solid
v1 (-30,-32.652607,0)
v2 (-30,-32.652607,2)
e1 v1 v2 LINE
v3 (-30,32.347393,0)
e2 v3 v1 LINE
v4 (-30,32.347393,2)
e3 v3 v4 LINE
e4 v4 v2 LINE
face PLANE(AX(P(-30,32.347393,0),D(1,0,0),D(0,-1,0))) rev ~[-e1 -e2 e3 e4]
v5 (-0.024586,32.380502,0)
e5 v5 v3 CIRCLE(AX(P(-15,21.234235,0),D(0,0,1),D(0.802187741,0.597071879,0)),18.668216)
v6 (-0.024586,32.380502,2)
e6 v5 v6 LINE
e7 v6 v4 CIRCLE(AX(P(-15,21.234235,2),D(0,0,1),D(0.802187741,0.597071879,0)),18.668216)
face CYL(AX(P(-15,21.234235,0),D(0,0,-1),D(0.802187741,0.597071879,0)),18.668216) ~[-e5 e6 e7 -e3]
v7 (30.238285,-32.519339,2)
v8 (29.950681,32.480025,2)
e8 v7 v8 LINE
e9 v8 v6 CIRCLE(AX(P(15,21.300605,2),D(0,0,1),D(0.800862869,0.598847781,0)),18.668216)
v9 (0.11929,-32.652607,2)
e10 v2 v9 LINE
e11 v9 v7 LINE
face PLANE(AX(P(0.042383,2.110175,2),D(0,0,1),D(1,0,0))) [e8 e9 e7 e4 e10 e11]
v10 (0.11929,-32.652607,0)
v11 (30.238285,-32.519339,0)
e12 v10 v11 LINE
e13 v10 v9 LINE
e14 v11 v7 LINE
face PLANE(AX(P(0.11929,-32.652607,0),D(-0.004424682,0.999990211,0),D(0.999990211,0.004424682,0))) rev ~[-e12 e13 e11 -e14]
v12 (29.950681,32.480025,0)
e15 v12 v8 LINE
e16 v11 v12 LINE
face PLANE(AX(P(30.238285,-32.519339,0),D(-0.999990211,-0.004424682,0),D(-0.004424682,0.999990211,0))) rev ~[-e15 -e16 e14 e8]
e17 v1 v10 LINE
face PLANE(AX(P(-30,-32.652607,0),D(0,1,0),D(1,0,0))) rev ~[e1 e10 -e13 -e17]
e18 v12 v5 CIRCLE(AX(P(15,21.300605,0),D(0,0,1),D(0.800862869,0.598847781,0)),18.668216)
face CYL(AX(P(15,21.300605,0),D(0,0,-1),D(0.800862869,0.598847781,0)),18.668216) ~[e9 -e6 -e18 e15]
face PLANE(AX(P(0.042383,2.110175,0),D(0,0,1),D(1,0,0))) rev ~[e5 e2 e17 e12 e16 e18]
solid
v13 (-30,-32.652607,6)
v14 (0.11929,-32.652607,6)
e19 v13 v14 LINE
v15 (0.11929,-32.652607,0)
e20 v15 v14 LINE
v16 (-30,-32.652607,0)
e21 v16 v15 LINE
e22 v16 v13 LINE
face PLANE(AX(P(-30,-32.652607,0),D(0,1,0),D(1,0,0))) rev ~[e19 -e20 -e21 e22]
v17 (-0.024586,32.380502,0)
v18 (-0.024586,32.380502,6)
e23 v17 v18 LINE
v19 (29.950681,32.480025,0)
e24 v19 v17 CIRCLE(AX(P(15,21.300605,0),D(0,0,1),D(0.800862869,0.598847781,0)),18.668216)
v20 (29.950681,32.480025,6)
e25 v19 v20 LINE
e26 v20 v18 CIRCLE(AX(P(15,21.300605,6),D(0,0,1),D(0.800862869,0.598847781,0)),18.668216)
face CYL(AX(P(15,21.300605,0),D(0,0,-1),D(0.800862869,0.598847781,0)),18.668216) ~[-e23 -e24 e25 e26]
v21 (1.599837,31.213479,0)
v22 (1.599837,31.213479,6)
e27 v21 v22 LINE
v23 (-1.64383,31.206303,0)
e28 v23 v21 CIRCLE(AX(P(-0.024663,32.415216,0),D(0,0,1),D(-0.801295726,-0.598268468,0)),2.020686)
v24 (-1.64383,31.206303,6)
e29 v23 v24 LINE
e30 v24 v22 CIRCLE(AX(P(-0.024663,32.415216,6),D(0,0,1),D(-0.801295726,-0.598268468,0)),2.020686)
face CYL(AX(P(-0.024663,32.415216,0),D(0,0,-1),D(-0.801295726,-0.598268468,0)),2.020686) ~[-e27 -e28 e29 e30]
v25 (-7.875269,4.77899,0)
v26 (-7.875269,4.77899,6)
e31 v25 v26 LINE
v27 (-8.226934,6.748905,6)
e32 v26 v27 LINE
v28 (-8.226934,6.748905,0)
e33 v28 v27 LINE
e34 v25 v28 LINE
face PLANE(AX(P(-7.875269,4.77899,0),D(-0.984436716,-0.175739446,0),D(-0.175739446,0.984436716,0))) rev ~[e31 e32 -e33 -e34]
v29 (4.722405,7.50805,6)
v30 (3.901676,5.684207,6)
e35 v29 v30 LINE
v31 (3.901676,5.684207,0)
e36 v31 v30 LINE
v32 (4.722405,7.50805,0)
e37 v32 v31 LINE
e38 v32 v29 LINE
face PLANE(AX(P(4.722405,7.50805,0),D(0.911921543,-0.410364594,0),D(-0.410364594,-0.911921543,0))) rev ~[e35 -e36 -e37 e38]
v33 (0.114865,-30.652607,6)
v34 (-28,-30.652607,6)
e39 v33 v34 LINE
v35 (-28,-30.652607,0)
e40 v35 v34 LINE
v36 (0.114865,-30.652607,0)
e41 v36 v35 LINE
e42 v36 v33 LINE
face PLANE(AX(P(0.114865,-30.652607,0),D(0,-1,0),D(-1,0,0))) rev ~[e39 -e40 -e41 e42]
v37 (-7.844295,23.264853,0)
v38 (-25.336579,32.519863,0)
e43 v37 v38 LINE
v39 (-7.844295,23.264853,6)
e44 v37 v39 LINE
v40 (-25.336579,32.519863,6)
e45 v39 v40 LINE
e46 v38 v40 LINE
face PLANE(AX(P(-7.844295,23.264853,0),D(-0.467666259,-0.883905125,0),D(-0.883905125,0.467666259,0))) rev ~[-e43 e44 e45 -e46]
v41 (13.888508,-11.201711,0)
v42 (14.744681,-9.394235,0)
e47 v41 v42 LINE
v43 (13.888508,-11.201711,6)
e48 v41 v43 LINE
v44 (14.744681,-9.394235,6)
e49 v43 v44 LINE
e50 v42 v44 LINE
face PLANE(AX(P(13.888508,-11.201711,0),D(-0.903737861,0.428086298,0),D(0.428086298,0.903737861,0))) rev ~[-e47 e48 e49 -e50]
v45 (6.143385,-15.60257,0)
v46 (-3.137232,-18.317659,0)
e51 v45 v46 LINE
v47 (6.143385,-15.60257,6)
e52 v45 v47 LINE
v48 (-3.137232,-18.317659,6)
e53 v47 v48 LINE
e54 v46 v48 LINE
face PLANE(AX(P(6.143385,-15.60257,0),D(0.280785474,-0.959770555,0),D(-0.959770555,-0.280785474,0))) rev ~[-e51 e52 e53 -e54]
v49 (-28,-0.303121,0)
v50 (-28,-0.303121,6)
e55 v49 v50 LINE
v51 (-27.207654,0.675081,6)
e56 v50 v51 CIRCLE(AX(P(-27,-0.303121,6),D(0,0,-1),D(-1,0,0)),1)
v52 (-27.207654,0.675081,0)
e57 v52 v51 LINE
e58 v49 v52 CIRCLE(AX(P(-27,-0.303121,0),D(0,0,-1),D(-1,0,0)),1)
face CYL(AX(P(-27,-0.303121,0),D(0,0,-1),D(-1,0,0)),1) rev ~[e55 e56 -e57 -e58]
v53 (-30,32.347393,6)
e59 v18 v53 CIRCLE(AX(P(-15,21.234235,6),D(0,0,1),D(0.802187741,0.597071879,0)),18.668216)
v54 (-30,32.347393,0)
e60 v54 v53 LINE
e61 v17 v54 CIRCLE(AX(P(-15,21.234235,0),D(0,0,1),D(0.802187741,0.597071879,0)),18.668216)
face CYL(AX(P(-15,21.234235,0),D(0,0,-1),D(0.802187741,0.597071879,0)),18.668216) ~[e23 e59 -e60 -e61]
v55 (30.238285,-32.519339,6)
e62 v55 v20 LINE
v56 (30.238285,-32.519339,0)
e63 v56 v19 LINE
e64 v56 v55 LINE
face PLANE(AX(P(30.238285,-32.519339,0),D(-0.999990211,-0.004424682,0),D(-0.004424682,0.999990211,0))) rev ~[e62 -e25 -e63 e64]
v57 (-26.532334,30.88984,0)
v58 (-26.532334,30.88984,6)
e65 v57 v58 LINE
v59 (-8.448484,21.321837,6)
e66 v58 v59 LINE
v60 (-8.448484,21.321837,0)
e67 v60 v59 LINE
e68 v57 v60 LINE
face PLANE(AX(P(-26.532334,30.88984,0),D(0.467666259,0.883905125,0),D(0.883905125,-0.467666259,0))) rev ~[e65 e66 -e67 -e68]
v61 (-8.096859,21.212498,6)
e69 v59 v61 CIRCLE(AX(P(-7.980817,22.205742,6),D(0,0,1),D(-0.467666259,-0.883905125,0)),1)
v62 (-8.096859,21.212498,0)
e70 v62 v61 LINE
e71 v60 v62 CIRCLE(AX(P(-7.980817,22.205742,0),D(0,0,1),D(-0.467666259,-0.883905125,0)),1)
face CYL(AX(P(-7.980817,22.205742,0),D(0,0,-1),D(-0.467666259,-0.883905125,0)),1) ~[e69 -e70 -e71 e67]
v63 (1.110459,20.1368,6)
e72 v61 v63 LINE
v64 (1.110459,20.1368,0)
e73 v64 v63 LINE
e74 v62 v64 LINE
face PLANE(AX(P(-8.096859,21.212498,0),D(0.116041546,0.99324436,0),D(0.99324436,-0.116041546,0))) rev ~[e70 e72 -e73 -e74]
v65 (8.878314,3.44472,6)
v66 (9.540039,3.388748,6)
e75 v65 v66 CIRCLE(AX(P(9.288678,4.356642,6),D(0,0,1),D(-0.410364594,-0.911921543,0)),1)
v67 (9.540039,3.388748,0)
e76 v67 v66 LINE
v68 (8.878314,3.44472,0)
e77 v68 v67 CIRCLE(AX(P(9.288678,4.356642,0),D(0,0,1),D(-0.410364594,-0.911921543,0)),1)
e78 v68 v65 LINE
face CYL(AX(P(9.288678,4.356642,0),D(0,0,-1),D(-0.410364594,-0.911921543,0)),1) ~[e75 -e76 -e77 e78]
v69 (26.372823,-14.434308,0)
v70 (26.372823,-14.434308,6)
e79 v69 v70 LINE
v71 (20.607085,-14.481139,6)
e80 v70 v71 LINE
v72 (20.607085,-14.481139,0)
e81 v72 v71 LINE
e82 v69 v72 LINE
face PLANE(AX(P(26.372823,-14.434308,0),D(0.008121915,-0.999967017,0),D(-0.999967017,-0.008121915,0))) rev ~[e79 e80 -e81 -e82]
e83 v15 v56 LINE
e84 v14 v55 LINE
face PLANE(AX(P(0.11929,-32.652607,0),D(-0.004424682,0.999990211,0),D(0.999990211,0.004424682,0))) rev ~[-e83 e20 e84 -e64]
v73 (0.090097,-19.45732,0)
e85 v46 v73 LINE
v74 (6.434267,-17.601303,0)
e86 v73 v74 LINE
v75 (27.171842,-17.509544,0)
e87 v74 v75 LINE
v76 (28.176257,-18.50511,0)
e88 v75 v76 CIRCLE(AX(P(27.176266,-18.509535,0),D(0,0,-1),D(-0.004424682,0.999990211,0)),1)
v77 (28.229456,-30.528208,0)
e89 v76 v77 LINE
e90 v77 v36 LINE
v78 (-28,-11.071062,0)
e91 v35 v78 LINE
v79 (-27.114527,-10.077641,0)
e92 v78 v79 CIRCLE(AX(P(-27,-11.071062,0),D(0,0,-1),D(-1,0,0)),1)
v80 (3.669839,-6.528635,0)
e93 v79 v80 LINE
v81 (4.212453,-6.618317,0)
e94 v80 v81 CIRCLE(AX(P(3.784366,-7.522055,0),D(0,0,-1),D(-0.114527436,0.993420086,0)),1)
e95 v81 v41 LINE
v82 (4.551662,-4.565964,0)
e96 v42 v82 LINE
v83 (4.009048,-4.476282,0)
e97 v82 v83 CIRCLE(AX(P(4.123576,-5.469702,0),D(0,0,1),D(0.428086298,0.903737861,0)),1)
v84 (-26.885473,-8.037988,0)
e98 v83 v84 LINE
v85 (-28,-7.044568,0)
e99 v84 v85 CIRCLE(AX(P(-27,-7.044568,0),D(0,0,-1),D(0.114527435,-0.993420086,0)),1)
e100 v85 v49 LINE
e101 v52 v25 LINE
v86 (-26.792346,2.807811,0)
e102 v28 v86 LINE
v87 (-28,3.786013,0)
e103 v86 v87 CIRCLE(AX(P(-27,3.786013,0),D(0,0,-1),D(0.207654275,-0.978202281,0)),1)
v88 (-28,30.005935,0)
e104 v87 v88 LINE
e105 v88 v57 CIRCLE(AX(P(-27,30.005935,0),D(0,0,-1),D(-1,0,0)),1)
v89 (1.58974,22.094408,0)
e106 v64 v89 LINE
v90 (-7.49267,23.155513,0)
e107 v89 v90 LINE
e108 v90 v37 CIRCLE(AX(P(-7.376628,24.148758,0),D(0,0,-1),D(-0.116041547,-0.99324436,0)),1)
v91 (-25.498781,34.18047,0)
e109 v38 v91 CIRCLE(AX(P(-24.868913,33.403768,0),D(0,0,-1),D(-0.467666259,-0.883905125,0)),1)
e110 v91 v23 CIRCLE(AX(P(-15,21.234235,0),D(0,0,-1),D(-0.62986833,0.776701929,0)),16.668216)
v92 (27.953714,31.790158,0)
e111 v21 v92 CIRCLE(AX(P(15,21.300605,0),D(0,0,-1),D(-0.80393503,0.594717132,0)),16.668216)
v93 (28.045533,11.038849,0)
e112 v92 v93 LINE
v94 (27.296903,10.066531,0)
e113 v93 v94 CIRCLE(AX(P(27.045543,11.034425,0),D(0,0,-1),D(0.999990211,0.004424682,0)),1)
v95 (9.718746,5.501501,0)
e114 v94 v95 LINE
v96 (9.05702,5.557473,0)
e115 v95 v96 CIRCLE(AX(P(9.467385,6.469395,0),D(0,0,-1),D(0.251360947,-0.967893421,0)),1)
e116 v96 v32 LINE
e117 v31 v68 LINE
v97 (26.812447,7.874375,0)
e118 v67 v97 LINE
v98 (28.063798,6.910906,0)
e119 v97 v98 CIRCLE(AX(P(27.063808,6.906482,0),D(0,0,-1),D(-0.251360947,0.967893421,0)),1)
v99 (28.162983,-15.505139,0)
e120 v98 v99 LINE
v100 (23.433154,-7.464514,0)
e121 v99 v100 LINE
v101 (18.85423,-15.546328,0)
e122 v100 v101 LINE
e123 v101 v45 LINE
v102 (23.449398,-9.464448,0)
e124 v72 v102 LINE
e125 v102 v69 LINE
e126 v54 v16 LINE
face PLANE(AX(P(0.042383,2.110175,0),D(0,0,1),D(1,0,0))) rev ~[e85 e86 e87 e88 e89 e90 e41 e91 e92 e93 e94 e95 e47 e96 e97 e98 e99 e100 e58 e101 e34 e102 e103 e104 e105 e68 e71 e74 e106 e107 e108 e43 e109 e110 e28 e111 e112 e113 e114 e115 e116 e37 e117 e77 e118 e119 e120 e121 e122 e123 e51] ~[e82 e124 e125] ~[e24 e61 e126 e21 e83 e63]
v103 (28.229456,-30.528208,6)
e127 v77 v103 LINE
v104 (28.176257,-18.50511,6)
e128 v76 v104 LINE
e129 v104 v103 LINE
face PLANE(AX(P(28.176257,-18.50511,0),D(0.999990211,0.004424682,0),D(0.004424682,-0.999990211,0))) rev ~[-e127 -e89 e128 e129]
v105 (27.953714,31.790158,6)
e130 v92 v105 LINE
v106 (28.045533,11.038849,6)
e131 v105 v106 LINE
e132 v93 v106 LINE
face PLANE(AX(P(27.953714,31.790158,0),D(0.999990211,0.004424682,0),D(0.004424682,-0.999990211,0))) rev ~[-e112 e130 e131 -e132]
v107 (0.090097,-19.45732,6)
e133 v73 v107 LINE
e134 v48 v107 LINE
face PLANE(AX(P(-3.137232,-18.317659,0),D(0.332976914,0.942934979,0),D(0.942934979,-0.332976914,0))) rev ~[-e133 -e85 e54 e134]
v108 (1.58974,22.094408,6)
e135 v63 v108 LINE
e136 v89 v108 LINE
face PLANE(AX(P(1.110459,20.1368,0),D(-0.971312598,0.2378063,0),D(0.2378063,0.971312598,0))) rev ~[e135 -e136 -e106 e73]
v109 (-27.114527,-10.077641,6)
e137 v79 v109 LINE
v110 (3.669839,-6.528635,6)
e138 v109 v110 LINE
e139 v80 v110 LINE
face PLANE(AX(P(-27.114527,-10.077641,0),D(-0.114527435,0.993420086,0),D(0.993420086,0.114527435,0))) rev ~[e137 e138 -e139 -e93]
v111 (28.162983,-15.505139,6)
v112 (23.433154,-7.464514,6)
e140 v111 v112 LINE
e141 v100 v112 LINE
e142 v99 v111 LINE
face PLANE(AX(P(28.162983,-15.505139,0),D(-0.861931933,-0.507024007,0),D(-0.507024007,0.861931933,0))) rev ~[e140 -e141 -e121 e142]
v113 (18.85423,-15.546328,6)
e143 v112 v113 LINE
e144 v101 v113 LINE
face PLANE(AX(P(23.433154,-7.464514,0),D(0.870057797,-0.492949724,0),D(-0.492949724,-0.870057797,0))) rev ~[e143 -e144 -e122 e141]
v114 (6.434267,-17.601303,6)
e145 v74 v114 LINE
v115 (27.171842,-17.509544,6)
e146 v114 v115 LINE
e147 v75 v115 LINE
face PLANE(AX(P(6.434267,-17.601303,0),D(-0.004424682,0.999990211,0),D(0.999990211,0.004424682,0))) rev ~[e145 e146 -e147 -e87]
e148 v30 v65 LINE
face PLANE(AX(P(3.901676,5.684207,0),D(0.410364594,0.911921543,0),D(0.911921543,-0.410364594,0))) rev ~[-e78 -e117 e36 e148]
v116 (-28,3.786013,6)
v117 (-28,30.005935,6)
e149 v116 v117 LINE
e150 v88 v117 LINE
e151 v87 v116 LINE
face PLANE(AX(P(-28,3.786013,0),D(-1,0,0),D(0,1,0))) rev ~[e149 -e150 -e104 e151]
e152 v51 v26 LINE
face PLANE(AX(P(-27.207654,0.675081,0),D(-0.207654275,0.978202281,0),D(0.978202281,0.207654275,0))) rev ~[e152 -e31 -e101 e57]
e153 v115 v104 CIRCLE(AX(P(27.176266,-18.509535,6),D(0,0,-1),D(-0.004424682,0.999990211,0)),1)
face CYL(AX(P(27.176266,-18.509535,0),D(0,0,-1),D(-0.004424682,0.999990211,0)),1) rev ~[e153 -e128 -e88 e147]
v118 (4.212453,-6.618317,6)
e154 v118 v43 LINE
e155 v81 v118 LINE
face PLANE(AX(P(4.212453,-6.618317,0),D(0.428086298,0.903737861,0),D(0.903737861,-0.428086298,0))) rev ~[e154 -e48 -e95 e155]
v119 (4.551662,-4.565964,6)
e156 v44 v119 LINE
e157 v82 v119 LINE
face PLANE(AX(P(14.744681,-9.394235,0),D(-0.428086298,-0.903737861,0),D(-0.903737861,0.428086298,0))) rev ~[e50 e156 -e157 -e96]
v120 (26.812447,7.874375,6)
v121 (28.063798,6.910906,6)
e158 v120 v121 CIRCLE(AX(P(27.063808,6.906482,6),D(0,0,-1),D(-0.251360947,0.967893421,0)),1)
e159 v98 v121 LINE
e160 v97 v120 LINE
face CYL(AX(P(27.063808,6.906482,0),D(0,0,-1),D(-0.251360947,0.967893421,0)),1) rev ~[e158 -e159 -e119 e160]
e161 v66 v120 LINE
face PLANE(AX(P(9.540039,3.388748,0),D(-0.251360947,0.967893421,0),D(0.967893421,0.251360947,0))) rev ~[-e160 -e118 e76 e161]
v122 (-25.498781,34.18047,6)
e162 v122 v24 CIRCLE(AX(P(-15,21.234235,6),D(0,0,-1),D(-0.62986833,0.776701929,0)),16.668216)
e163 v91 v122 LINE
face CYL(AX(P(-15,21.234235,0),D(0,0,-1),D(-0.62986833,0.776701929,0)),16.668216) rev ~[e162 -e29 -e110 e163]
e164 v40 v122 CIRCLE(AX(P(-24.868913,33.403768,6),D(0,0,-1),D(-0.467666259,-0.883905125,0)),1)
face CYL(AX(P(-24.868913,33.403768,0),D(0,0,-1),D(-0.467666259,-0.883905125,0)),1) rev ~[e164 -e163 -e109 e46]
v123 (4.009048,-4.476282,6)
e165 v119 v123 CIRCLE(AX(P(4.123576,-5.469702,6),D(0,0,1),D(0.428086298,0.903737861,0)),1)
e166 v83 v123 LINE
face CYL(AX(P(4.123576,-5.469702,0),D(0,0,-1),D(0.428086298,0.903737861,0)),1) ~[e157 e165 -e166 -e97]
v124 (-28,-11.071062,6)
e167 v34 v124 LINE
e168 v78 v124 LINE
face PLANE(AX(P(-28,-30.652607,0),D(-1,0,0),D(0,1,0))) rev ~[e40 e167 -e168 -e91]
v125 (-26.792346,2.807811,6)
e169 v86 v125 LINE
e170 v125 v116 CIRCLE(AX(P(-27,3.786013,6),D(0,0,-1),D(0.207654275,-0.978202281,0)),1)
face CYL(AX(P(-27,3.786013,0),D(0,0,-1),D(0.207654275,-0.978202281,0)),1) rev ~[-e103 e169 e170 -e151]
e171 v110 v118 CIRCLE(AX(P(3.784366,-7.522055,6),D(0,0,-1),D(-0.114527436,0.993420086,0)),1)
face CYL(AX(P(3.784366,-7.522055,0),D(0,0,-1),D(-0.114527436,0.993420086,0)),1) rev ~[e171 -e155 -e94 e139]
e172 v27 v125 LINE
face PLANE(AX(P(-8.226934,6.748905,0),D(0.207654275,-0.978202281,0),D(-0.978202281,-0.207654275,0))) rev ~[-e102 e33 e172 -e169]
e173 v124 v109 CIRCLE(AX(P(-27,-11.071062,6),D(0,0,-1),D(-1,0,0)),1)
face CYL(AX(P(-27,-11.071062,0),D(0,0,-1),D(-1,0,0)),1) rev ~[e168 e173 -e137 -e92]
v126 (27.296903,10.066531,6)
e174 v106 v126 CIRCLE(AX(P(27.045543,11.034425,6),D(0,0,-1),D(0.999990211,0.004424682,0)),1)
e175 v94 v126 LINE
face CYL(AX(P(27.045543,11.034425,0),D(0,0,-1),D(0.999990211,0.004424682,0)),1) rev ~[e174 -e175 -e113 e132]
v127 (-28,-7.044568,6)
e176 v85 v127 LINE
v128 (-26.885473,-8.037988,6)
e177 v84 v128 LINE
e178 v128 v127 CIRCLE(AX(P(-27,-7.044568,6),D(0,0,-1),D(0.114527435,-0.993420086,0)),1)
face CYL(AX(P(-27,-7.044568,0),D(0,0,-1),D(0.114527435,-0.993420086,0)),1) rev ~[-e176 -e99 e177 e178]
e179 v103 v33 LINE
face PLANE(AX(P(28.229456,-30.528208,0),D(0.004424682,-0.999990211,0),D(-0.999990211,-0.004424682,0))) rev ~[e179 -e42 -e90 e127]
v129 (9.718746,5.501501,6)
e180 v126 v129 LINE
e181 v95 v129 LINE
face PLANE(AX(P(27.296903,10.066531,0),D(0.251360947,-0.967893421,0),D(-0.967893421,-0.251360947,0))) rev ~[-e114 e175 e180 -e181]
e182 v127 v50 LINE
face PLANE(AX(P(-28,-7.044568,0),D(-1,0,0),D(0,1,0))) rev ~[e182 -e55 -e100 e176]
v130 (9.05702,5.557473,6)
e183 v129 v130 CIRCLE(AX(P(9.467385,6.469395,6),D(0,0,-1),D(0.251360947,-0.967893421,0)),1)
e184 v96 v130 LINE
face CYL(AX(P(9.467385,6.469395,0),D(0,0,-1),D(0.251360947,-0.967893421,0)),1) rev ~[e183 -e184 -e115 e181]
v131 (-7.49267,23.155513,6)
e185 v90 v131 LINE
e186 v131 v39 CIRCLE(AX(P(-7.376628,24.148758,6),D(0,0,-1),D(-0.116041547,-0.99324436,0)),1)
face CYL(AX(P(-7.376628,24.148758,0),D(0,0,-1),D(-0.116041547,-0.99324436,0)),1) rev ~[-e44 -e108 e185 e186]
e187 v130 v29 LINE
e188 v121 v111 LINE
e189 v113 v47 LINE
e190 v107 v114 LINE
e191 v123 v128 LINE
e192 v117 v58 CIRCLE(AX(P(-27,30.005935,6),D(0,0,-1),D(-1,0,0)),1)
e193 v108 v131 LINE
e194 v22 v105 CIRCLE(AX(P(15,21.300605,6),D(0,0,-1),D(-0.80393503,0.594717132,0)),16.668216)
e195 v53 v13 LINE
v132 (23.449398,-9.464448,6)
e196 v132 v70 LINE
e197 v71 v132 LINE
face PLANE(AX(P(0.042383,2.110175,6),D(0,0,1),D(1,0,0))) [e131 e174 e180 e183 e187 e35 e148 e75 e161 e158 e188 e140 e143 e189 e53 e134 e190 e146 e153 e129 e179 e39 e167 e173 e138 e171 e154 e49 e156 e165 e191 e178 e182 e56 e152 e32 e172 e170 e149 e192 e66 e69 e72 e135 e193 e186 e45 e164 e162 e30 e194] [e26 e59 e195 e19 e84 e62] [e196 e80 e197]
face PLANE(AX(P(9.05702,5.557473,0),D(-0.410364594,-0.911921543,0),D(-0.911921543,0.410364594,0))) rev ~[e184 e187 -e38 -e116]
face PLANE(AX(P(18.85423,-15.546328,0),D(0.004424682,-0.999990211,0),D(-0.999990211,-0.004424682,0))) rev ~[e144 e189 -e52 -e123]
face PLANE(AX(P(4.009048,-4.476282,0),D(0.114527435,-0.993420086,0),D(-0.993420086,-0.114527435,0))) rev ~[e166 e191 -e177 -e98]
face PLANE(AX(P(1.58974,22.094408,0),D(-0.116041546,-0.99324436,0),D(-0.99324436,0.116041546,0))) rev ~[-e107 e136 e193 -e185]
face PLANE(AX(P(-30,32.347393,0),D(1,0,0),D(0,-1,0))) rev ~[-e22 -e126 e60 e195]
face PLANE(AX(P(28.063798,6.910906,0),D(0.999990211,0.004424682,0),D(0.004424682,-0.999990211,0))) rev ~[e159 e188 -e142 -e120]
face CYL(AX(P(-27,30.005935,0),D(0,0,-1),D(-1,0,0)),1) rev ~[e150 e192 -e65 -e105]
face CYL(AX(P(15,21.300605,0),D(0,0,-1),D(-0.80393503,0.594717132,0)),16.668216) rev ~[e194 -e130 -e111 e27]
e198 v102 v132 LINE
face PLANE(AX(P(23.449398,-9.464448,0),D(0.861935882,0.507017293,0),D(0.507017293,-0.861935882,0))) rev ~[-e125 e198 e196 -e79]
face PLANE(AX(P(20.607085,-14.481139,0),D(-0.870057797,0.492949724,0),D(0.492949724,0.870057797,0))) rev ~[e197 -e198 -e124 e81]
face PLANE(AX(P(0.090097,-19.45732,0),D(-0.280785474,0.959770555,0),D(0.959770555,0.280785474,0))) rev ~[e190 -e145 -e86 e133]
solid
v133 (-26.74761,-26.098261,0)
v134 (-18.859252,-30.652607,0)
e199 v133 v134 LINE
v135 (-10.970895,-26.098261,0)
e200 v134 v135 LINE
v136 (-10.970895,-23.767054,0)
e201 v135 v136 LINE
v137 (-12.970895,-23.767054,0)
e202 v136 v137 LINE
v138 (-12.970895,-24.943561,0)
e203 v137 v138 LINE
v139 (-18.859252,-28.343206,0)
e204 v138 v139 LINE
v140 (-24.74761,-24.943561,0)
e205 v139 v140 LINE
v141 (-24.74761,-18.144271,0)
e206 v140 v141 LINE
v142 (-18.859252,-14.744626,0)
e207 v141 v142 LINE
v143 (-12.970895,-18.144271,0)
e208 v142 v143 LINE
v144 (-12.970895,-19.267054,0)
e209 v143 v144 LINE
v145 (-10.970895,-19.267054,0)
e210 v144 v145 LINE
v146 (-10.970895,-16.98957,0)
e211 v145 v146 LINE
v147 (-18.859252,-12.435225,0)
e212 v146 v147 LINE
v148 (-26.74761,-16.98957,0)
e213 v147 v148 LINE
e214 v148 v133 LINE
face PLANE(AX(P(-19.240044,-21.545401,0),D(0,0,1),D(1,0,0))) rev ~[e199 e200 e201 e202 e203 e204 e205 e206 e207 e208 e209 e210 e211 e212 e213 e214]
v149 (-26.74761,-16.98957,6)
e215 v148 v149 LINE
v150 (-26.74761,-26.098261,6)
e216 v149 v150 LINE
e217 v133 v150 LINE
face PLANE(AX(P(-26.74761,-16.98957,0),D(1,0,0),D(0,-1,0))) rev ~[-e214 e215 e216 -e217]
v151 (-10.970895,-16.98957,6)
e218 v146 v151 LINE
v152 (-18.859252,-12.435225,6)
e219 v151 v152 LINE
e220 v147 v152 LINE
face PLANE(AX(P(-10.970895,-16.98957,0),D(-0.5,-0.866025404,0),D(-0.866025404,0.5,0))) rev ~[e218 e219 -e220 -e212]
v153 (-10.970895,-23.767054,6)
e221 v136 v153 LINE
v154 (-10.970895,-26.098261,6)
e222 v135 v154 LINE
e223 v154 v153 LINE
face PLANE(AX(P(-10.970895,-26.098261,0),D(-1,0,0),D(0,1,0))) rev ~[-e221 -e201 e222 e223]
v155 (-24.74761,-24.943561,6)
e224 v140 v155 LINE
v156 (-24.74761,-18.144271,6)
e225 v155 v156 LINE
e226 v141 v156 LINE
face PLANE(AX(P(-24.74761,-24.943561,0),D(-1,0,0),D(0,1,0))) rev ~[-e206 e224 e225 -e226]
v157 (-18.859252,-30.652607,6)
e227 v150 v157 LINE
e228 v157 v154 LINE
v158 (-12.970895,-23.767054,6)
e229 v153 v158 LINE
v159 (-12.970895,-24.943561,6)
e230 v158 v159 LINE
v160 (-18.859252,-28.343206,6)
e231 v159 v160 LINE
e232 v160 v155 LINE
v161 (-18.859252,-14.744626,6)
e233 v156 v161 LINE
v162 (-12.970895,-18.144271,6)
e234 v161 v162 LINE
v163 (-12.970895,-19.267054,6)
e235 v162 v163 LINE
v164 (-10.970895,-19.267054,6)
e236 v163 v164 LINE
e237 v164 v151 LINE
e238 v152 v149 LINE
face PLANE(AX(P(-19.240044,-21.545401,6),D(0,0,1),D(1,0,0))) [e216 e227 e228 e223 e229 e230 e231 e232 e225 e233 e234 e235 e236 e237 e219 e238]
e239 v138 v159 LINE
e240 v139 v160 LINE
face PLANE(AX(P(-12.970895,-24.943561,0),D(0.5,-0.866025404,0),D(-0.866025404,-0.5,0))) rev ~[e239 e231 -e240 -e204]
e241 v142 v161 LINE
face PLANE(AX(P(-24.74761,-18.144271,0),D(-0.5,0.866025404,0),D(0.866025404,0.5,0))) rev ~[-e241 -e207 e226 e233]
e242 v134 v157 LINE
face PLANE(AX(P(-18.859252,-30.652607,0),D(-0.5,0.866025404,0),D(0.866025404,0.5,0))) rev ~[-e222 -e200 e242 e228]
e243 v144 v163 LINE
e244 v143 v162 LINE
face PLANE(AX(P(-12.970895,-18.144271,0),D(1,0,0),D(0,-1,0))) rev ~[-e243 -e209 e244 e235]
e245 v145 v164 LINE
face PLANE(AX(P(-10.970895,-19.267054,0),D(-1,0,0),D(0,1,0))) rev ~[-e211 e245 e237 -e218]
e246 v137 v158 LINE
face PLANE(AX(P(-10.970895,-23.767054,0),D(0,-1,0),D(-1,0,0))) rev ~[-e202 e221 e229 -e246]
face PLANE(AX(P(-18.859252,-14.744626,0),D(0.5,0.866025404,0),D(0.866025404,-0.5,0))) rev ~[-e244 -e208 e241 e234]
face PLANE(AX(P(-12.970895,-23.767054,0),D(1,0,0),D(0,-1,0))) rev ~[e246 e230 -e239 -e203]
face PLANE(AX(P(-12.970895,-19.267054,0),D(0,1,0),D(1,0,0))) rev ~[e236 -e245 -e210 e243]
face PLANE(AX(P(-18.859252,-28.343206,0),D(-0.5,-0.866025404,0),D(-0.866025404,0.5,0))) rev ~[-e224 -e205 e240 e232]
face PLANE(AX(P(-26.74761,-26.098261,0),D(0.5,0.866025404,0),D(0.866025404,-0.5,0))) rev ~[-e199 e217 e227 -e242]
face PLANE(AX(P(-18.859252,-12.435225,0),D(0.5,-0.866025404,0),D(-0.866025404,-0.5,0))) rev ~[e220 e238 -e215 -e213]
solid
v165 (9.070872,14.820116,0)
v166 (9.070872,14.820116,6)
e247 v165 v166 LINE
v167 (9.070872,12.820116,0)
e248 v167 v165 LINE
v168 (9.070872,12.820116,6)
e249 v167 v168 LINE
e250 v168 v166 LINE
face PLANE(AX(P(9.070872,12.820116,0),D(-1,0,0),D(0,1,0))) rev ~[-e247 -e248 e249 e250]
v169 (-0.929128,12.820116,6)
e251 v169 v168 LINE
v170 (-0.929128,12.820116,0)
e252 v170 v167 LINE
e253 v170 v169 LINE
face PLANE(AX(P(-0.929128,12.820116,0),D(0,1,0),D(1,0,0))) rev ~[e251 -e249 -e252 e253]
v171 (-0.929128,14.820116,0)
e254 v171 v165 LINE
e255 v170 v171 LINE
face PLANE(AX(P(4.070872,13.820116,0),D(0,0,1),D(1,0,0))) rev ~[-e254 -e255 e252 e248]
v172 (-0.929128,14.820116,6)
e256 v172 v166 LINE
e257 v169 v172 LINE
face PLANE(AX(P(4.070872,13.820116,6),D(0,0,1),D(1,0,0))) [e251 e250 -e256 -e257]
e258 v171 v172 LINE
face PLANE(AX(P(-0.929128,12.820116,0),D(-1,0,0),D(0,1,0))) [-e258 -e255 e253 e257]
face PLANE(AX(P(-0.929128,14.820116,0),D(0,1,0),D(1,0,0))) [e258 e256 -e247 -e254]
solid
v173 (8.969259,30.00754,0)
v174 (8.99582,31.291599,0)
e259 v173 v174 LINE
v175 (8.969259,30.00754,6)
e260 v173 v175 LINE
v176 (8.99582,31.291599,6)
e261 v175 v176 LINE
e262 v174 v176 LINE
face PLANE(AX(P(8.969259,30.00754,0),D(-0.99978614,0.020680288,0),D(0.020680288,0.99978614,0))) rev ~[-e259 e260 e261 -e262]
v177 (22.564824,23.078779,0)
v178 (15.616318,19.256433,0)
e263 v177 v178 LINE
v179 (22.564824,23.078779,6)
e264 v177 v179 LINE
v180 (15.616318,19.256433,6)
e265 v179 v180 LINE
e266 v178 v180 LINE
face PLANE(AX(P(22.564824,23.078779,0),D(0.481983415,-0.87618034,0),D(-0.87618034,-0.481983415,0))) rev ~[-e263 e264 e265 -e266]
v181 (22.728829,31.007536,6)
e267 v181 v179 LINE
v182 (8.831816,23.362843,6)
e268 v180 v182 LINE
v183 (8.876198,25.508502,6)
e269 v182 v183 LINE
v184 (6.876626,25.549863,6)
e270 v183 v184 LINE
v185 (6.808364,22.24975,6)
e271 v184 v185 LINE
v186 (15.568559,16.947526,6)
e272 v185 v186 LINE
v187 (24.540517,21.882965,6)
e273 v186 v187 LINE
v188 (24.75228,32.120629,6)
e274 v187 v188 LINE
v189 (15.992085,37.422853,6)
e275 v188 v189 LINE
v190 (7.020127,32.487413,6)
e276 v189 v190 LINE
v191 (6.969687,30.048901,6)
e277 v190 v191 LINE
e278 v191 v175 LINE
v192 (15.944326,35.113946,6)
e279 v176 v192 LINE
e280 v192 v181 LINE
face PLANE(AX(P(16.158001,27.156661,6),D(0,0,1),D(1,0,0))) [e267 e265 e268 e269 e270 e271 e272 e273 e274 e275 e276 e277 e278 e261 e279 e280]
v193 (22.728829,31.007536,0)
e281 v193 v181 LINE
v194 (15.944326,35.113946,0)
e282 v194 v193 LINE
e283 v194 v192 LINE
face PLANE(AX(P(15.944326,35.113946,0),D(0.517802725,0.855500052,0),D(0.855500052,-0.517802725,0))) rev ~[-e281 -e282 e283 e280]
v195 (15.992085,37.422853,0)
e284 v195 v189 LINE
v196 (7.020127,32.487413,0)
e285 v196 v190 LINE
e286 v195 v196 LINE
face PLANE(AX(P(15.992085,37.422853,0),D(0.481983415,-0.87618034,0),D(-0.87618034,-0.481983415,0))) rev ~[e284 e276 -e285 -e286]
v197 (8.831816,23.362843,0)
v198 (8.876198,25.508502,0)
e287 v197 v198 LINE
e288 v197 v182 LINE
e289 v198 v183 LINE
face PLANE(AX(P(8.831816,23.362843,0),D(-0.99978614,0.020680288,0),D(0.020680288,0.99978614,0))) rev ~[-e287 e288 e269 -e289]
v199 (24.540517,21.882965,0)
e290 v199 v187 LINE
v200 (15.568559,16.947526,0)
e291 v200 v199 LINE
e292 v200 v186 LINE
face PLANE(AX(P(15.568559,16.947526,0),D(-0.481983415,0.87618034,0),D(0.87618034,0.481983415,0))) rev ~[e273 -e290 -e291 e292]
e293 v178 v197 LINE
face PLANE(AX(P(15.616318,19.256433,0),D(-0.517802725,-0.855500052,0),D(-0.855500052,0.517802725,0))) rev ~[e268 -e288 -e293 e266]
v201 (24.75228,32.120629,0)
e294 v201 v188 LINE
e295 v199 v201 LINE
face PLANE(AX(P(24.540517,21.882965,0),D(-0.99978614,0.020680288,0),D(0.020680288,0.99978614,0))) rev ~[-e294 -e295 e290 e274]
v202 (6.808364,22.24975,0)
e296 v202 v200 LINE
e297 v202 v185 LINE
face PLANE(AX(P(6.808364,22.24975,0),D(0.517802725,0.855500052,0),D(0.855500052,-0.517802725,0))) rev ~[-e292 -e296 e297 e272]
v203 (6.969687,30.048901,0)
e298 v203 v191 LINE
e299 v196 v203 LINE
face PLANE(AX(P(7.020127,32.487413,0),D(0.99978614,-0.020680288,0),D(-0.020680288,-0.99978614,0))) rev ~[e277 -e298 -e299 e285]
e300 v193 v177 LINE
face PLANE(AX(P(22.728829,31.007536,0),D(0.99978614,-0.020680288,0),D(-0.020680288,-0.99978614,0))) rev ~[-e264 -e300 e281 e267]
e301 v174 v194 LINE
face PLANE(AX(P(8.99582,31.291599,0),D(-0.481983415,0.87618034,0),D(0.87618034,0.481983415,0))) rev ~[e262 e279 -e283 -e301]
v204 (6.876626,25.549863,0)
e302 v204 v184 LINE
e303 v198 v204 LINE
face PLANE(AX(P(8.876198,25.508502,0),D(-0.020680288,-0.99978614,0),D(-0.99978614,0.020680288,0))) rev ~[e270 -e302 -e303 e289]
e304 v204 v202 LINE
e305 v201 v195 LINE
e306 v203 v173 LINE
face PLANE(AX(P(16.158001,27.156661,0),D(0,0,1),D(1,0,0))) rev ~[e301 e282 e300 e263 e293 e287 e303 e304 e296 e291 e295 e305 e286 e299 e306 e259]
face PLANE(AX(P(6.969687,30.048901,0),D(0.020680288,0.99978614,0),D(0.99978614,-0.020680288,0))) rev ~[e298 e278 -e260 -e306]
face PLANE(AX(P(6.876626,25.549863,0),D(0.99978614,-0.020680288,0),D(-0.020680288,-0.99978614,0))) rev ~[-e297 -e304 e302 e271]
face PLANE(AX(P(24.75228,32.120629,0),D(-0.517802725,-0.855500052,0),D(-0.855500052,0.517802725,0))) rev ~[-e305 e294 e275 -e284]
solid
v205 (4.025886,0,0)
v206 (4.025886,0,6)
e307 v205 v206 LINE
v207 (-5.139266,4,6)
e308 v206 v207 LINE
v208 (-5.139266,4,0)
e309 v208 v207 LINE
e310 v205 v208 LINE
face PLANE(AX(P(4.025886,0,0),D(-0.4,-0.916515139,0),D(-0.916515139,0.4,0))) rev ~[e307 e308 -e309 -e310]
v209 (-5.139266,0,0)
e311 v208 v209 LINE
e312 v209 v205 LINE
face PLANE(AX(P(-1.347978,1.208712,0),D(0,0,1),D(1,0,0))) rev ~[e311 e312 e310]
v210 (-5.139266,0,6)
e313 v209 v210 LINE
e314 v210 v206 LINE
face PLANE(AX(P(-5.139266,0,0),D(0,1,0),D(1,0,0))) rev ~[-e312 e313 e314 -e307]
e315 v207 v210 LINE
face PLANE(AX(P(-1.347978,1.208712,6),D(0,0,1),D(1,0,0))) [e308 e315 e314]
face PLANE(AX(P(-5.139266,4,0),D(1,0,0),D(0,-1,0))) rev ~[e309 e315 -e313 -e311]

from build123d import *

# Parameters (mm, degrees)
F1_DEPTH = 6
F0_W     = 10
F0_H     = 2
F3_DEPTH = 2


# Not quite as in the source:
# - ends of sketch curves that miss each other by under 0.0002 mm in the source are joined


with BuildPart() as f1:
    # F0 (on Top) → F1 (new body)
    with BuildSketch(Plane.XY):
        with BuildLine():
            Line((-30, 32.3473930837), (-30, -32.6526069163))
            Line((-30, -32.6526069163), (0.1192900786, -32.6526069163))
            Line((0.1192900786, -32.6526069163), (30.2382853209, -32.5193386265))
            Line((30.2382853209, -32.5193386265), (29.9506809711, 32.4800250915))
            ThreePointArc((29.9506809711, 32.4800250915), (14.938018386, 39.9687184444), (-0.0245860478, 32.3805016191))
            ThreePointArc((-0.0245860478, 32.3805016191), (-15.0206194621, 39.9024393927), (-30, 32.3473930837))
        make_face()
        with BuildLine():
            Line((-18.8592523336, -30.6526069163), (-28, -30.6526069163))
            Line((-28, -30.6526069163), (-28, -11.0710615659))
            ThreePointArc((-28, -11.0710615659), (-27.7465009831, -10.4056772542), (-27.1145274354, -10.0776414803))
            Line((-27.1145274354, -10.0776414803), (3.6698389075, -6.5286347923))
            ThreePointArc((3.6698389075, -6.5286347923), (3.9474323278, -6.5354397125), (4.2124526409, -6.6183170169))
            Line((4.2124526409, -6.6183170169), (13.8885083595, -11.2017112184))
            Line((13.8885083595, -11.2017112184), (14.7446809555, -9.3942354963))
            Line((14.7446809555, -9.3942354963), (4.5516618753, -4.5659639457))
            ThreePointArc((4.5516618753, -4.5659639457), (4.2866415622, -4.4830866414), (4.0090481419, -4.4762817211))
            Line((4.0090481419, -4.4762817211), (-26.8854725646, -8.0379876659))
            ThreePointArc((-26.8854725646, -8.0379876659), (-27.6653843117, -7.7910685633), (-28, -7.0445675803))
            Line((-28, -7.0445675803), (-28, -0.3031208943))
            ThreePointArc((-28, -0.3031208943), (-27.777063149, 0.3263017478), (-27.2076542751, 0.6750813864))
            Line((-27.2076542751, 0.6750813864), (-7.8752691202, 4.7789896525))
            Line((-7.8752691202, 4.7789896525), (-8.2269339416, 6.748904602))
            Line((-8.2269339416, 6.748904602), (-26.7923457249, 2.8078106154))
            ThreePointArc((-26.7923457249, 2.8078106154), (-27.6294226421, 3.0089497471), (-28, 3.7860128961))
            Line((-28, 3.7860128961), (-28, 30.0059348114))
            ThreePointArc((-28, 30.0059348114), (-27.5159136269, 30.8625754184), (-26.5323337407, 30.8898399364))
            Line((-26.5323337407, 30.8898399364), (-8.4484836928, 21.3218373695))
            ThreePointArc((-8.4484836928, 21.3218373695), (-8.2777475055, 21.2508432682), (-8.0968589797, 21.212498134))
            Line((-8.0968589797, 21.212498134), (1.1104592122, 20.1367996633))
            Line((1.1104592122, 20.1367996633), (1.589740147, 22.0944080593))
            Line((1.589740147, 22.0944080593), (-7.4926699193, 23.1555134121))
            ThreePointArc((-7.4926699193, 23.1555134121), (-7.673558445, 23.1938585463), (-7.8442946323, 23.2648526476))
            Line((-7.8442946323, 23.2648526476), (-25.336579259, 32.5198632656))
            ThreePointArc((-25.336579259, 32.5198632656), (-25.864176528, 33.3065546609), (-25.4987813298, 34.1804703197))
            ThreePointArc((-25.4987813298, 34.1804703197), (-12.9378201369, 37.7743931473), (-1.6438298189, 31.2063028557))
            ThreePointArc((-1.6438298189, 31.2063028557), (-0.0201923897, 30.3945345597), (1.599837329, 31.2134789892))
            ThreePointArc((1.599837329, 31.2134789892), (14.6353510123, 37.9648321663), (27.9537138644, 31.790158276))
            Line((27.9537138644, 31.790158276), (28.0455327124, 11.0388493912))
            ThreePointArc((28.0455327124, 11.0388493912), (27.837893783, 10.4243595923), (27.2969034481, 10.0665312879))
            Line((27.2969034481, 10.0665312879), (9.7187459346, 5.5015014827))
            ThreePointArc((9.7187459346, 5.5015014827), (9.3831012246, 5.4729531105), (9.0570203938, 5.557473361))
            Line((9.0570203938, 5.557473361), (4.7224049972, 7.5080498132))
            Line((4.7224049972, 7.5080498132), (3.9016758092, 5.6842067279))
            Line((3.9016758092, 5.6842067279), (8.8783137321, 3.4447202094))
            ThreePointArc((8.8783137321, 3.4447202094), (9.2043945629, 3.3601999588), (9.5400392729, 3.388748331))
            Line((9.5400392729, 3.388748331), (26.8124465698, 7.8743751129))
            ThreePointArc((26.8124465698, 7.8743751129), (27.6738726331, 7.6988329735), (28.0637977276, 6.9109063742))
            Line((28.0637977276, 6.9109063742), (28.1629825794, -15.5051393439))
            Line((28.1629825794, -15.5051393439), (23.4331540021, -7.4645135844))
            Line((23.4331540021, -7.4645135844), (18.8542303832, -15.5463280182))
            Line((18.8542303832, -15.5463280182), (6.1433850081, -15.6025700214))
            Line((6.1433850081, -15.6025700214), (-3.1372315382, -18.3176588576))
            Line((-3.1372315382, -18.3176588576), (0.0900974588, -19.4573196774))
            Line((0.0900974588, -19.4573196774), (6.4342668447, -17.6013025272))
            Line((6.4342668447, -17.6013025272), (27.1718417329, -17.5095444483))
            ThreePointArc((27.1718417329, -17.5095444483), (27.8802375517, -17.7993060772), (28.1762566263, -18.5051099771))
            Line((28.1762566263, -18.5051099771), (28.2294555342, -30.528207569))
            Line((28.2294555342, -30.528207569), (0.1148653747, -30.6526069163))
            Line((0.1148653747, -30.6526069163), (-18.8592523336, -30.6526069163))
        make_face(mode=Mode.SUBTRACT)
        Polygon((20.6070848965, -14.4811387909), (23.4493978311, -9.4644476178), (26.3728233626, -14.4343084113), align=None, mode=Mode.SUBTRACT)
    extrude(amount=F1_DEPTH)


with BuildPart() as f1b:
    # F0 (on Top) → F1, piece 2 (new body)
    with BuildSketch(Plane.XY):
        Polygon((22.7288285259, 31.0075356756), (22.5648244879, 23.0787793067), (15.616318033, 19.2564327856), (8.8318156161, 23.3628426333), (8.8761979714, 25.5085024983), (6.8766256914, 25.549863074), (6.8083637966, 22.2497496149), (15.5685589539, 16.9475255974), (24.5405172283, 21.8829651369), (24.7522803454, 32.120628694), (15.9920851882, 37.4228527116), (7.0201269138, 32.487413172), (6.9696869869, 30.0489007039), (8.9692592668, 30.0075401282), (8.9958196542, 31.2915990022), (15.9443261091, 35.1139455234), align=None)
    extrude(amount=F1_DEPTH)


with BuildPart() as f1c:
    # F0 (on Top) → F1, piece 3 (new body)
    with BuildSketch(Plane.XY):
        with Locations((4.0708723292, 13.8201162443)):
            Rectangle(F0_W, F0_H)
    extrude(amount=F1_DEPTH)


with BuildPart() as f1d:
    # F0 (on Top) → F1, piece 4 (new body)
    with BuildSketch(Plane.XY):
        Polygon((-5.1392655546, 4), (-5.1392655546, 0), (4.0258858353, 0), align=None)
    extrude(amount=F1_DEPTH)


with BuildPart() as f1e:
    # F0 (on Top) → F1, piece 5 (new body)
    with BuildSketch(Plane.XY):
        Polygon((-26.7476101638, -26.0982613996), (-18.8592523336, -30.6526069163), (-10.9708945035, -26.0982613996), (-10.9708945035, -23.7670542747), (-12.9708945035, -23.7670542747), (-12.9708945035, -24.9435608612), (-18.8592523336, -28.3432058396), (-24.7476101638, -24.9435608612), (-24.7476101638, -18.1442709045), (-18.8592523336, -14.7446259262), (-12.9708945035, -18.1442709045), (-12.9708945035, -19.2670542747), (-10.9708945035, -19.2670542747), (-10.9708945035, -16.9895703661), (-18.8592523336, -12.4352248494), (-26.7476101638, -16.9895703661), align=None)
    extrude(amount=F1_DEPTH)


with BuildPart() as f3:
    # F2 (on Top) → F3 (new body)
    with BuildSketch(Plane.XY):
        with BuildLine():
            Line((-30, 32.3473930837), (-30, -32.6526069163))
            Line((-30, -32.6526069163), (0.1192900786, -32.6526069163))
            Line((0.1192900786, -32.6526069163), (30.2382853209, -32.5193386265))
            Line((30.2382853209, -32.5193386265), (29.9506809711, 32.4800250915))
            ThreePointArc((29.9506809711, 32.4800250915), (14.938018386, 39.9687184444), (-0.0245860478, 32.3805016191))
            ThreePointArc((-0.0245860478, 32.3805016191), (-15.0206194621, 39.9024393927), (-30, 32.3473930837))
        make_face()
    extrude(amount=F3_DEPTH)


solid = Compound([f1.part, f1b.part, f1c.part, f1d.part, f1e.part, f3.part])
